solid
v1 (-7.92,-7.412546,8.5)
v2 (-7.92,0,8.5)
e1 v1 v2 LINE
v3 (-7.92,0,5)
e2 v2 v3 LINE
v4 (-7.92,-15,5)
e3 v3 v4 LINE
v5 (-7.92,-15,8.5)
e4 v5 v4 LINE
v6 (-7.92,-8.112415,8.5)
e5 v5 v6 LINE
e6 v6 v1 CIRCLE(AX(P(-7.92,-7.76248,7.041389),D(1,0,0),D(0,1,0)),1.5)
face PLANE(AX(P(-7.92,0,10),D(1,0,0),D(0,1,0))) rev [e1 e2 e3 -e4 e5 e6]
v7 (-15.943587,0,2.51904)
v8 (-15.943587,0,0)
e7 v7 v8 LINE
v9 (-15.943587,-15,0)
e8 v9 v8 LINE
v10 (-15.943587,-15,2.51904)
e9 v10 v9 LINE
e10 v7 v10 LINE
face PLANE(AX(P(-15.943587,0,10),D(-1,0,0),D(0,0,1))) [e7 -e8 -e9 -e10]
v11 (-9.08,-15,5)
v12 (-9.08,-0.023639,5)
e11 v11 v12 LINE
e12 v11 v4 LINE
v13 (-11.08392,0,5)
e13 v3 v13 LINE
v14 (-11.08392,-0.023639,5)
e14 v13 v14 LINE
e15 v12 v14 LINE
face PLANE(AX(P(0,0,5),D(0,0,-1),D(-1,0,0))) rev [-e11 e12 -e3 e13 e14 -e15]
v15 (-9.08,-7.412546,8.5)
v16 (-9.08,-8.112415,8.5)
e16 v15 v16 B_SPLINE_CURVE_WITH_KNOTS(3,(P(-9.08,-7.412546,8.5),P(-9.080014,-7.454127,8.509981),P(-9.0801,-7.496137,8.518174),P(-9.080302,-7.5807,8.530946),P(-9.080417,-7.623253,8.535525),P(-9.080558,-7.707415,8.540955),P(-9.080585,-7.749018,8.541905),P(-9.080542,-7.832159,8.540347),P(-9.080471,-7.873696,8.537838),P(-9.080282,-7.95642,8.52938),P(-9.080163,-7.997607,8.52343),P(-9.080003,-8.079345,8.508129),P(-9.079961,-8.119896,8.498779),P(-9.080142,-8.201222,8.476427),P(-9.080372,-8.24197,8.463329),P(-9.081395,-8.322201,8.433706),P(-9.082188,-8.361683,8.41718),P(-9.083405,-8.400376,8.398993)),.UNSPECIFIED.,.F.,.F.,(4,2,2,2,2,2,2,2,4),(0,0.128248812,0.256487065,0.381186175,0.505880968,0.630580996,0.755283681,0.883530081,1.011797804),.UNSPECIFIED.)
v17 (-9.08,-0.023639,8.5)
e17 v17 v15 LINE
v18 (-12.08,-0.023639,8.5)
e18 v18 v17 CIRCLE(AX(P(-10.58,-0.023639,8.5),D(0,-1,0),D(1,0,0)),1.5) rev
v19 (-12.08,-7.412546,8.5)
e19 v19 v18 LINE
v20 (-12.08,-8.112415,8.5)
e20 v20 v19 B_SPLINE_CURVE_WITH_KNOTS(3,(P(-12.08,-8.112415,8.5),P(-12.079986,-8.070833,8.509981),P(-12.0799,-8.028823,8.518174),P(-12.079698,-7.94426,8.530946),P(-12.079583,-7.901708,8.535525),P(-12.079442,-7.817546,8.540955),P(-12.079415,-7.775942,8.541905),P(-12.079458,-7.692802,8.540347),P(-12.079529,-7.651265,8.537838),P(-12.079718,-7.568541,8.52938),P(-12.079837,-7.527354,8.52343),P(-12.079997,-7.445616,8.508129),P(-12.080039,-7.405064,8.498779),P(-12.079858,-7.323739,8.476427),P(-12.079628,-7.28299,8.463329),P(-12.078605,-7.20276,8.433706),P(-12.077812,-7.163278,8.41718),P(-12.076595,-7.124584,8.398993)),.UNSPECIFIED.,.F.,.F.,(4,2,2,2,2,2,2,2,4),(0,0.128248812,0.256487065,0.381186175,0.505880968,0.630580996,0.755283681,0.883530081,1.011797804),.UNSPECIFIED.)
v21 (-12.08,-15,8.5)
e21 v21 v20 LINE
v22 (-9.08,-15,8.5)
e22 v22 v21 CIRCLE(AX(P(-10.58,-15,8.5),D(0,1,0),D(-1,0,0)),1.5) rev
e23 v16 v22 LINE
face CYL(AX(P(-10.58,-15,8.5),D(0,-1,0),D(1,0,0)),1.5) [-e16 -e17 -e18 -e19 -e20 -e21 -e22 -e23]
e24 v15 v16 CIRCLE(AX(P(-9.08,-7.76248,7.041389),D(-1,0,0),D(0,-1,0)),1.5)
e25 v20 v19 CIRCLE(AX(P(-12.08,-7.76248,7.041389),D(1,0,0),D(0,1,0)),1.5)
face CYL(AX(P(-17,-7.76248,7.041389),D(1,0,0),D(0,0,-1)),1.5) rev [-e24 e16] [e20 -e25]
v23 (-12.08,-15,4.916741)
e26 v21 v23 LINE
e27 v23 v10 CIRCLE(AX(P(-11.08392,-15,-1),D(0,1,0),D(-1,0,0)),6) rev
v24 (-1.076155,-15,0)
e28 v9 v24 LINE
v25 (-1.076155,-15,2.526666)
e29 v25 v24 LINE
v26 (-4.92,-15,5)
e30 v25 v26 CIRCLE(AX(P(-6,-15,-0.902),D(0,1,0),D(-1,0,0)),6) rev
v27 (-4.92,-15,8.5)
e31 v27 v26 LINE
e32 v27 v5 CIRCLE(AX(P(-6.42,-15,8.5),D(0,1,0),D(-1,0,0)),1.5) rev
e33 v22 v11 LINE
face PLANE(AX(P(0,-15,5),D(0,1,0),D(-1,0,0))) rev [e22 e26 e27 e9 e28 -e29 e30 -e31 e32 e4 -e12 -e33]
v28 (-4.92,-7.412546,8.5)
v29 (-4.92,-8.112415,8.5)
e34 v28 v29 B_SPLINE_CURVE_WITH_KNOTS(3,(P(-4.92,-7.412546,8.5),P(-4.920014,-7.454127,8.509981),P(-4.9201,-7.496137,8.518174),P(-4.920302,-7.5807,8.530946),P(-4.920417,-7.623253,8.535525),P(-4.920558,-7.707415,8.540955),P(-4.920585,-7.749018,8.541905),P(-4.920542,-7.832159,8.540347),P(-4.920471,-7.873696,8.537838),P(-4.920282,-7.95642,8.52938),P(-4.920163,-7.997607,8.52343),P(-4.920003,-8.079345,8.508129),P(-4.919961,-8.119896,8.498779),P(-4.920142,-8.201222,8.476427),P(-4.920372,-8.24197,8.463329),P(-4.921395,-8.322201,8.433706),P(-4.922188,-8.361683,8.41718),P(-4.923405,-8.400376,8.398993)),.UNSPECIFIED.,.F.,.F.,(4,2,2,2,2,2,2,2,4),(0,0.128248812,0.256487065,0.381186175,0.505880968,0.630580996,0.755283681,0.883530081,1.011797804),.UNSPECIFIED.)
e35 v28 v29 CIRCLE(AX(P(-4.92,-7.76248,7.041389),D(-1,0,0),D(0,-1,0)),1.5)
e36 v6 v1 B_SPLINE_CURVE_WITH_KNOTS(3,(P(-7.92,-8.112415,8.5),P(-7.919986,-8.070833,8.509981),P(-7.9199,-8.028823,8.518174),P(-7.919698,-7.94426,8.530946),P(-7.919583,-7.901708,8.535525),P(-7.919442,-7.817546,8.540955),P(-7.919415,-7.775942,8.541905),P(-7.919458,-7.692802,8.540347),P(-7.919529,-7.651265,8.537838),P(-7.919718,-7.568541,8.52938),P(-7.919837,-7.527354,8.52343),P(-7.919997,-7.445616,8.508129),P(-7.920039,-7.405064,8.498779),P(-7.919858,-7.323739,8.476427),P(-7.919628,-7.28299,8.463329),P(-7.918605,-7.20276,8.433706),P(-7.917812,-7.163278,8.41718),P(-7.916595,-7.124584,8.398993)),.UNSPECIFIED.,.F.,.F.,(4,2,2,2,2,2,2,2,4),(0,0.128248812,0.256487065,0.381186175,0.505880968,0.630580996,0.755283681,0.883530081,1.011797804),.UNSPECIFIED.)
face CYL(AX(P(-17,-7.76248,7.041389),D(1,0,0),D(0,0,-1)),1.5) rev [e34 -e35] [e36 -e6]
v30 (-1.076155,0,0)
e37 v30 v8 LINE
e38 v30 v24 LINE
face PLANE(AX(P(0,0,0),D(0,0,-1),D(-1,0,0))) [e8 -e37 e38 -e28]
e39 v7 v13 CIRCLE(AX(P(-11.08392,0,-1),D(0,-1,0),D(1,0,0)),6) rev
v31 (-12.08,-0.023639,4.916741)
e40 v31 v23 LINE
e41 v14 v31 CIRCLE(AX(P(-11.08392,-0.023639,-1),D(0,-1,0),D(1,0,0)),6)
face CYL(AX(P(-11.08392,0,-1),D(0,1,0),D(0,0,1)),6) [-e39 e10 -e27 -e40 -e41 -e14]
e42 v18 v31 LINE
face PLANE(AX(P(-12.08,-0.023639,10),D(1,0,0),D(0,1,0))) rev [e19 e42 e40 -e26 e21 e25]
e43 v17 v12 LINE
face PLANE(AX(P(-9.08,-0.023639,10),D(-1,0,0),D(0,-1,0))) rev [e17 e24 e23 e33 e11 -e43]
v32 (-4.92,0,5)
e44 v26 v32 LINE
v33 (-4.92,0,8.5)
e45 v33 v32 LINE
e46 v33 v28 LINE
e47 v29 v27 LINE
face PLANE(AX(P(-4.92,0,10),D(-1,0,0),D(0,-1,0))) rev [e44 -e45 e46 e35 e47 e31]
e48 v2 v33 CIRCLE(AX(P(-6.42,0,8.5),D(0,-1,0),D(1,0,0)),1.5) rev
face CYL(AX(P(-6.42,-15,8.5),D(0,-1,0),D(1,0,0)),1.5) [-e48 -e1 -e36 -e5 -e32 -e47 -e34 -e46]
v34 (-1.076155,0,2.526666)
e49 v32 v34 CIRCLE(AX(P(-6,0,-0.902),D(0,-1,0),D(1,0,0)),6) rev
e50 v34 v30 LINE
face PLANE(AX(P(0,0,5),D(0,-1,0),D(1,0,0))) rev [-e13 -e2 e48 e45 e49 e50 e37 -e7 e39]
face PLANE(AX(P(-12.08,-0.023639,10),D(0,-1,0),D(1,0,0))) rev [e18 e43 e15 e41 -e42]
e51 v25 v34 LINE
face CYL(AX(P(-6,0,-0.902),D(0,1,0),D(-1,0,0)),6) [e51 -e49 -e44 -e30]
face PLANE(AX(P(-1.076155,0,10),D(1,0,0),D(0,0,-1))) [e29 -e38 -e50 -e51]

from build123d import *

# Parameters (mm, degrees)
SKETCH1_W               = 17
SKETCH1_H               = 15
BOSS_EXTRUDE1_DEPTH     = 5
SKETCH2_W               = 3
SKETCH2_H               = 15
SKETCH2_H_2             = 14.97636143
BOSS_EXTRUDE2_DEPTH     = 5
CUT_EXTRUDE2_DEPTH      = 21.185301583
CUT_EXTRUDE2_DEPTH_BACK = 21.185301583
SKETCH4_R               = 1.5
FILLET1_R               = 6
FILLET3_RADIUS          = 1.5
FILLET3_LENGTH          = 14.97636143
FILLET4_RADIUS          = 1.5
FILLET4_LENGTH          = 15
SKETCH5_W               = 1.007967197
SKETCH5_H               = 15
SKETCH5_W_2             = 1.056413299
CUT_EXTRUDE4_DEPTH      = 10


with BuildPart() as part:
    # Sketch1 → Boss-Extrude1 (new body)
    with BuildSketch(Plane.XY):
        with Locations((-8.5, -7.5)):
            Rectangle(SKETCH1_W, SKETCH1_H)
    extrude(amount=BOSS_EXTRUDE1_DEPTH)

    # Sketch2 → Boss-Extrude2 (add)
    with BuildSketch(Plane.XY.offset(5)):
        with Locations((-6.42, -7.5)):
            Rectangle(SKETCH2_W, SKETCH2_H)
        with Locations((-10.58, -7.511819285)):
            Rectangle(SKETCH2_W, SKETCH2_H_2)
    extrude(amount=BOSS_EXTRUDE2_DEPTH)

    # Sketch4 → Cut-Extrude2 (cut, two sides: drawn at the far end of the back side and taken through both)
    with BuildSketch(Plane(origin=(-9.08, 0, 0), x_dir=(0, 0, -1), z_dir=(1, 0, 0)).offset(-CUT_EXTRUDE2_DEPTH_BACK)):
        with Locations(Location((-7.041389116, -7.762480296, 0), (0, 0, 270))):
            Circle(SKETCH4_R)
    extrude(amount=CUT_EXTRUDE2_DEPTH + CUT_EXTRUDE2_DEPTH_BACK, mode=Mode.SUBTRACT)

    # Fillet1
    # the kernel refuses this fillet: 6 mm, written as the material it takes off along each edge
    with BuildSketch(Plane(origin=(0, -29.754999153, 5), x_dir=(0, 0, -1), z_dir=(0, 1, 0))) as fillet1_piece_1:
        with BuildLine():
            CenterArc((5.901999661, 6), FILLET1_R, 190.369759805, 79.630240195)
            Line((0, 4.92), (0, 0))
            Line((0, 0), (5.901999661, 0))
        make_face()
    extrude(amount=44.509998306, mode=Mode.SUBTRACT)
    # the kernel refuses this fillet: 6 mm, written as the material it takes off along each edge
    with BuildSketch(Plane(origin=(-17, 14.790199458, 5), x_dir=(0, 0, -1), z_dir=(0, -1, 0))) as fillet1_2_piece_1_section:
        with BuildLine():
            CenterArc((6, 5.916079783), FILLET1_R, 180, 80.405931773)
            Line((0, 5.916079783), (0, 0))
            Line((0, 0), (5, 0))
        make_face()
    fillet1_2_piece_1 = extrude(amount=44.580398916, mode=Mode.PRIVATE)
    fillet1_2_piece_1 = split(fillet1_2_piece_1, bisect_by=Plane(origin=(-17, -0.02363857, 5), z_dir=(0, 1, 0)), keep=Keep.TOP, mode=Mode.PRIVATE)
    fillet1_2_piece_1 = split(fillet1_2_piece_1, bisect_by=Plane(origin=(-12.08, 14.790199458, 5), z_dir=(-1, 0, 0)), keep=Keep.TOP, mode=Mode.PRIVATE)
    add(fillet1_2_piece_1, mode=Mode.SUBTRACT)
    with BuildSketch(Plane(origin=(-17, 14.790199458, 5), x_dir=(0, 0, -1), z_dir=(0, -1, 0))) as fillet1_2_piece_2_section:
        with BuildLine():
            CenterArc((6, 5.916079783), FILLET1_R, 180, 80.405931773)
            Line((0, 5.916079783), (0, 0))
            Line((0, 0), (5, 0))
        make_face()
    fillet1_2_piece_2 = extrude(amount=44.580398916, mode=Mode.PRIVATE)
    fillet1_2_piece_2 = split(fillet1_2_piece_2, bisect_by=Plane(origin=(-17, -0.02363857, 5), z_dir=(0, 1, 0)), keep=Keep.TOP, mode=Mode.PRIVATE)
    fillet1_2_piece_2 = split(fillet1_2_piece_2, bisect_by=Plane(origin=(-12.08, 14.790199458, 5), z_dir=(1, 0, 0)), keep=Keep.TOP, mode=Mode.PRIVATE)
    add(fillet1_2_piece_2, mode=Mode.SUBTRACT)
    with BuildSketch(Plane(origin=(-17, 14.790199458, 5), x_dir=(0, 0, -1), z_dir=(0, -1, 0))) as fillet1_2_piece_3_section:
        with BuildLine():
            CenterArc((6, 5.916079783), FILLET1_R, 180, 80.405931773)
            Line((0, 5.916079783), (0, 0))
            Line((0, 0), (5, 0))
        make_face()
    fillet1_2_piece_3 = extrude(amount=44.580398916, mode=Mode.PRIVATE)
    fillet1_2_piece_3 = split(fillet1_2_piece_3, bisect_by=Plane(origin=(-17, -0.02363857, 5), z_dir=(0, -1, 0)), keep=Keep.TOP, mode=Mode.PRIVATE)
    fillet1_2_piece_3 = split(fillet1_2_piece_3, bisect_by=Plane(origin=(-12.08, 14.790199458, 5), z_dir=(-1, 0, 0)), keep=Keep.TOP, mode=Mode.PRIVATE)
    add(fillet1_2_piece_3, mode=Mode.SUBTRACT)

    # Fillet3: full round fillet: the end face becomes a half cylinder, R = half its width
    fillet3_face = Plane((-10.58, -7.511819285, 10), x_dir=(0, -1, 0), z_dir=(0, 0, 1))  # on the end face: x along it, z out of the body
    fillet3_slab = fillet3_face.offset(-FILLET3_RADIUS / 2) * Box(FILLET3_LENGTH, 2 * FILLET3_RADIUS, FILLET3_RADIUS, mode=Mode.PRIVATE)  # the body's end, R deep
    fillet3_round = Plane((-10.58, -7.511819285, 8.5), x_dir=(0, 0, 1), z_dir=(0, -1, 0)) * Cylinder(FILLET3_RADIUS, FILLET3_LENGTH, mode=Mode.PRIVATE)  # its axis R under the face
    add(fillet3_slab - fillet3_round, mode=Mode.SUBTRACT)

    # Fillet4: full round fillet: the end face becomes a half cylinder, R = half its width
    fillet4_face = Plane((-6.42, -7.5, 10), x_dir=(0, -1, 0), z_dir=(0, 0, 1))  # on the end face: x along it, z out of the body
    fillet4_slab = fillet4_face.offset(-FILLET4_RADIUS / 2) * Box(FILLET4_LENGTH, 2 * FILLET4_RADIUS, FILLET4_RADIUS, mode=Mode.PRIVATE)  # the body's end, R deep
    fillet4_round = Plane((-6.42, -7.5, 8.5), x_dir=(0, 0, 1), z_dir=(0, -1, 0)) * Cylinder(FILLET4_RADIUS, FILLET4_LENGTH, mode=Mode.PRIVATE)  # its axis R under the face
    add(fillet4_slab - fillet4_round, mode=Mode.SUBTRACT)

    # Sketch5 → Cut-Extrude4 (cut)
    with BuildSketch(Plane.XY):
        with Locations((-0.572171345, -7.5)):
            Rectangle(SKETCH5_W, SKETCH5_H)
        with Locations((-16.471793351, -7.5)):
            Rectangle(SKETCH5_W_2, SKETCH5_H)
    extrude(amount=CUT_EXTRUDE4_DEPTH, mode=Mode.SUBTRACT)


solid = part.part
